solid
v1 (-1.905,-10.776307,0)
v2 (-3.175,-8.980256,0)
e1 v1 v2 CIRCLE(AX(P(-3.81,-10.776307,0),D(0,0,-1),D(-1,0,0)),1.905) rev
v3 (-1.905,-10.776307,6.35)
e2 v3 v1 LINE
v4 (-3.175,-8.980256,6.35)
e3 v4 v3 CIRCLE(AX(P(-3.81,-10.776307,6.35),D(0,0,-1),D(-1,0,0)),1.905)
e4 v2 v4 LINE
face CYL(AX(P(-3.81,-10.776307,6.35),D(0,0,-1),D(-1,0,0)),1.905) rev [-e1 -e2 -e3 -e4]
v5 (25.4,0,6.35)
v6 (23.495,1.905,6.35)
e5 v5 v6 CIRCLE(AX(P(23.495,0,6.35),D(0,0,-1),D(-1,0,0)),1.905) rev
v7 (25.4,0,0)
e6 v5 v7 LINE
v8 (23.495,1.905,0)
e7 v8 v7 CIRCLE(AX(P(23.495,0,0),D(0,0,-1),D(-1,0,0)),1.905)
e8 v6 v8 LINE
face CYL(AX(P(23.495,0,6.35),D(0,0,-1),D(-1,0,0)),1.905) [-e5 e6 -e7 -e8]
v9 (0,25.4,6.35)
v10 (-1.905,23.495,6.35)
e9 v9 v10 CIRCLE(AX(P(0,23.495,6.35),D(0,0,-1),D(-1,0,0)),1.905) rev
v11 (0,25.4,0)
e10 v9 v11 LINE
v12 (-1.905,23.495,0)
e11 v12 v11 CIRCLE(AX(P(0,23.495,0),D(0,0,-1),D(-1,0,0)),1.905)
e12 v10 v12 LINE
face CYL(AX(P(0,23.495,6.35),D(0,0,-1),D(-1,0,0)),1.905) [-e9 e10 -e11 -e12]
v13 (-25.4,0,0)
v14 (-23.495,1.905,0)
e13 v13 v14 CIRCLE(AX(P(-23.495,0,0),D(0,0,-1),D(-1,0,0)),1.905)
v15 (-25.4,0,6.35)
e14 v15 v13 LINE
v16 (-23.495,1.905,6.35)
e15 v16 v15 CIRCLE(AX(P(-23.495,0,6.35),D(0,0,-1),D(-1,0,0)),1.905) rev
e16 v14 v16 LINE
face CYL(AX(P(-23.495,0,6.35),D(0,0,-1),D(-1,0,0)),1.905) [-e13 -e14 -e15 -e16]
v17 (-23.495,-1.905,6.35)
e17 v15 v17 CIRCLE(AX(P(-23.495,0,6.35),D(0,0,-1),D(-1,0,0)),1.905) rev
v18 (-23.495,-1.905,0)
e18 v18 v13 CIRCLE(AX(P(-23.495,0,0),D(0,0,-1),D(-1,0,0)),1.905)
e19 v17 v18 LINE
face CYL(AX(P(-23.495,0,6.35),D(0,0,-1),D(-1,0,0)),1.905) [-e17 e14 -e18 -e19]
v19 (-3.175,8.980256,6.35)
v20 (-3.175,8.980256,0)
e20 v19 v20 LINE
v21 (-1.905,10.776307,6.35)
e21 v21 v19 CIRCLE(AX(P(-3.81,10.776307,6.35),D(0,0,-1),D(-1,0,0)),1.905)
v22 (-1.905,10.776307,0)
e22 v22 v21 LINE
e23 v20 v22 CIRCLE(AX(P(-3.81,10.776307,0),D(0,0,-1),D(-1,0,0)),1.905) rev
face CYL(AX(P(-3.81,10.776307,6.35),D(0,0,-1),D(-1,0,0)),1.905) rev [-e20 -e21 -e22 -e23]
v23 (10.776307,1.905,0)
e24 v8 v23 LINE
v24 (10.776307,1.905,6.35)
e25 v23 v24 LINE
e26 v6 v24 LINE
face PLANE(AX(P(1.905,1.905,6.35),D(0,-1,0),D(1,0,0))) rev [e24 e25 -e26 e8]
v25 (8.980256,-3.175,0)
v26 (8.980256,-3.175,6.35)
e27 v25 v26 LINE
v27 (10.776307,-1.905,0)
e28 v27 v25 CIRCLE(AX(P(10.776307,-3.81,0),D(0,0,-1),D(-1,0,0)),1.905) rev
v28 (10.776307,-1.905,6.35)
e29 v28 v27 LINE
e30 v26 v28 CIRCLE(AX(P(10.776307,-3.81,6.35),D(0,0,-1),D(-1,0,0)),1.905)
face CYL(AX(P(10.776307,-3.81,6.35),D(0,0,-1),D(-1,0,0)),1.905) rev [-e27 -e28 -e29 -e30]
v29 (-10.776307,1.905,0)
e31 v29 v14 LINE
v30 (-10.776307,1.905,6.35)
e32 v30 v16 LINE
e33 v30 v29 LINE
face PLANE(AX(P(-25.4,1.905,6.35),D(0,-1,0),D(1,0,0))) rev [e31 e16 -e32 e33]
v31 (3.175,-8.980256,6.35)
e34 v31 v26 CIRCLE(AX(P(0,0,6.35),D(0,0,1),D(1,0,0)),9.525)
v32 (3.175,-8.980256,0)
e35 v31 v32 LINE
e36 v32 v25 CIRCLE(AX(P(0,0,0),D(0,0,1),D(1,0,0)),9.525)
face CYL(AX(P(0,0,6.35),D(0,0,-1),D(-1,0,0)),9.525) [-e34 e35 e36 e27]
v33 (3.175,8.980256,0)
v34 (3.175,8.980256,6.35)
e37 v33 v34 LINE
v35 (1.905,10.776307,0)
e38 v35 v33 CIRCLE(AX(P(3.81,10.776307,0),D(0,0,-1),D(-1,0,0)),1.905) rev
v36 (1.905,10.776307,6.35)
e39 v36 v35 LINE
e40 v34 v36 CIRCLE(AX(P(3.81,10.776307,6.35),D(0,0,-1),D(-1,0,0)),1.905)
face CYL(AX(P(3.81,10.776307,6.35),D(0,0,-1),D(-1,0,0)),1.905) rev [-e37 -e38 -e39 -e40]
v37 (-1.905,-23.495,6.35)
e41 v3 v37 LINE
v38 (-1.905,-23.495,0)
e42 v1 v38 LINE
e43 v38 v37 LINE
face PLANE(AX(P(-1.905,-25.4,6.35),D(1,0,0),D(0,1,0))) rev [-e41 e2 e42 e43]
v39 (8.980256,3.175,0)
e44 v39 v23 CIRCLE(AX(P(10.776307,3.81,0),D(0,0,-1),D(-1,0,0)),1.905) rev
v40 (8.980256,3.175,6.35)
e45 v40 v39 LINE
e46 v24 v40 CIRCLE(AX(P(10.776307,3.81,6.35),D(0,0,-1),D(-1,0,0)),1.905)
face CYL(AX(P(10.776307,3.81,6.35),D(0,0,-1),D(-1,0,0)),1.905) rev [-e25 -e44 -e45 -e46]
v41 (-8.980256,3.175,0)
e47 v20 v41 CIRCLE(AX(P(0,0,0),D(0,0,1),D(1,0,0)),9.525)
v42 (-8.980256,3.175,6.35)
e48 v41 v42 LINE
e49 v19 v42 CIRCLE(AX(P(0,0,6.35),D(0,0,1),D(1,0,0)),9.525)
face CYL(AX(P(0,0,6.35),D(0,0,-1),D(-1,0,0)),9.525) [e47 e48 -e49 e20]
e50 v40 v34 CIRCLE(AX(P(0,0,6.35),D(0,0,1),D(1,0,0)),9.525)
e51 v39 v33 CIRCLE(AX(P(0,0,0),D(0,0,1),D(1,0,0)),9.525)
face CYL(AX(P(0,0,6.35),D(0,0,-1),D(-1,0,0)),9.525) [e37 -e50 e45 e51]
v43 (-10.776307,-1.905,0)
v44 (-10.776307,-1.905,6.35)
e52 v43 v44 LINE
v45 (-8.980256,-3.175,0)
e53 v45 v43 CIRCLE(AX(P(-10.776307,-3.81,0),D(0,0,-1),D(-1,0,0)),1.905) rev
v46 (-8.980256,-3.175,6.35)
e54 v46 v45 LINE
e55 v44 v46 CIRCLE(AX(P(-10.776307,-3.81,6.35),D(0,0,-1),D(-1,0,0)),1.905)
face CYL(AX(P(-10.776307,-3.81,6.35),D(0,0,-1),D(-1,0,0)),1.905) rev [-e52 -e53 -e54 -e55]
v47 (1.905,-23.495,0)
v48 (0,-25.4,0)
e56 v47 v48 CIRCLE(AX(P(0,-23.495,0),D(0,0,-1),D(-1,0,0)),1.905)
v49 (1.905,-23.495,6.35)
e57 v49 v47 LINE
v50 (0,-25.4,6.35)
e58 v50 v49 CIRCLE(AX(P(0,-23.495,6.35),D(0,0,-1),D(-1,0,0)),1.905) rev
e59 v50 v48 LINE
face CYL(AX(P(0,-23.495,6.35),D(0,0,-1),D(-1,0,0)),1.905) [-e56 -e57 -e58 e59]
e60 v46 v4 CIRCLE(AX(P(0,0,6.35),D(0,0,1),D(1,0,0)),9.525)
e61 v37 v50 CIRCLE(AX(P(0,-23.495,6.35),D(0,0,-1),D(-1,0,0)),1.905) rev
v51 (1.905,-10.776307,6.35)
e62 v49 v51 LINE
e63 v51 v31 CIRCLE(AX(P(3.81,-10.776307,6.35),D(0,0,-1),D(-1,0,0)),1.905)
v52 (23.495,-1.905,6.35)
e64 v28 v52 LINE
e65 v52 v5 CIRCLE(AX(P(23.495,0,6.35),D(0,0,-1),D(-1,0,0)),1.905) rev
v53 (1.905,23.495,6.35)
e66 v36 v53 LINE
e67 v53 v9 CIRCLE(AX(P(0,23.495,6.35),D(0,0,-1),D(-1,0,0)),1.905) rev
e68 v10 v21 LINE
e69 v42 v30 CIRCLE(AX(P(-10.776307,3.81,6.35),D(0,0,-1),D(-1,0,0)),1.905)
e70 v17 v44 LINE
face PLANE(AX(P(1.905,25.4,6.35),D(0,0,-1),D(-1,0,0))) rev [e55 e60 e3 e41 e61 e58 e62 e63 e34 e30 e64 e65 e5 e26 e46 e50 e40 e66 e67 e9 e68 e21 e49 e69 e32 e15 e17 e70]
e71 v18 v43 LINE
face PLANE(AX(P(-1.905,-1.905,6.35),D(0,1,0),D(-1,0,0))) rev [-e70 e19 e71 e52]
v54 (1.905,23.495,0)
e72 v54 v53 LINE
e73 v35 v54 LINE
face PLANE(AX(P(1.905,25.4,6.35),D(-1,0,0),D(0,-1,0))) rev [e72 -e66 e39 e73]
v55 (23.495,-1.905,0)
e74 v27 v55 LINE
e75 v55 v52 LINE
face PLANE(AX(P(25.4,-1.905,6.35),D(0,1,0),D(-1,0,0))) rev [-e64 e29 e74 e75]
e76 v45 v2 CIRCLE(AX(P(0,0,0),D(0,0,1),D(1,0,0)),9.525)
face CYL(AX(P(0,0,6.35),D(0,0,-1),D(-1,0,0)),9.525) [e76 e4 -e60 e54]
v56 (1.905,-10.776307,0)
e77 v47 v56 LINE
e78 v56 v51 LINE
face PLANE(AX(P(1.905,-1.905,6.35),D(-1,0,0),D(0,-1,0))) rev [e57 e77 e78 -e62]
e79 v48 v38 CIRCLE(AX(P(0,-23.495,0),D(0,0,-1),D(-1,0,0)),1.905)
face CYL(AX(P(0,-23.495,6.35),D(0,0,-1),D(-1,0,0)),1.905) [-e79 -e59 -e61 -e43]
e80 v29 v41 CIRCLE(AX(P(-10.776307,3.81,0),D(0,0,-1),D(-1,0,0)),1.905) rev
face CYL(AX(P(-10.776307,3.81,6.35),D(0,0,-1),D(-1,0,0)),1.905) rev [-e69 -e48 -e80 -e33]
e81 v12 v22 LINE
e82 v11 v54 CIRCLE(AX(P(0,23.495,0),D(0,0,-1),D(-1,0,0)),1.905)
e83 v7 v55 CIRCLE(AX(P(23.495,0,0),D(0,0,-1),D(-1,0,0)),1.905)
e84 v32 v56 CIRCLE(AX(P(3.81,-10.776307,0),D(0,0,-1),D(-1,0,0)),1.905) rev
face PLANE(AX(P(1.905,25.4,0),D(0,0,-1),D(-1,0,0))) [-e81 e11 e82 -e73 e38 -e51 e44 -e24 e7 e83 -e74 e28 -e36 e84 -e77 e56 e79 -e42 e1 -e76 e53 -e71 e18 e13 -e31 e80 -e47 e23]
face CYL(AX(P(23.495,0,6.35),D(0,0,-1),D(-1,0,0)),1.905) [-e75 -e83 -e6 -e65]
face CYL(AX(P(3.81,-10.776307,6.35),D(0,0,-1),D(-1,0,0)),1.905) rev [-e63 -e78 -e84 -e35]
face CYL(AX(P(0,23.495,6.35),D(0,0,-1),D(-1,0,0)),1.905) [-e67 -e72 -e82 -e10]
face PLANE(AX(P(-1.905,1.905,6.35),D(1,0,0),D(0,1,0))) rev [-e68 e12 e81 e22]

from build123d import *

# Parameters (mm, degrees)
BOSS_EXTRUDE1_DEPTH = 6.35
SKETCH2_R           = 9.525
BOSS_EXTRUDE2_DEPTH = 6.35
FILLET1_R           = 1.905


with BuildPart() as part:
    # Sketch1 → Boss-Extrude1 (new body)
    with BuildSketch(Plane.XY):
        Polygon((0, 25.4), (1.905, 25.4), (1.905, 1.905), (25.4, 1.905), (25.4, 0), (25.4, -1.905), (1.905, -1.905), (1.905, -25.4), (0, -25.4), (-1.905, -25.4), (-1.905, -1.905), (-25.4, -1.905), (-25.4, 0), (-25.4, 1.905), (-1.905, 1.905), (-1.905, 25.4), align=None)
    extrude(amount=BOSS_EXTRUDE1_DEPTH)

    # Sketch2 → Boss-Extrude2 (add)
    with BuildSketch(Plane.XY):
        Circle(SKETCH2_R)
    extrude(amount=BOSS_EXTRUDE2_DEPTH)

    # Fillet1
    fillet1_edges = [part.edges().sort_by_distance(p)[0] for p in [
        (-9.33255592, -1.905, 3.175),
        (-1.905, -9.33255592, 3.175),
        (-9.33255592, 1.905, 3.175),
        (-1.905, 9.33255592, 3.175),
        (1.905, 9.33255592, 3.175),
        (9.33255592, 1.905, 3.175),
        (9.33255592, -1.905, 3.175),
        (1.905, -9.33255592, 3.175),
        (25.4, 1.905, 3.175),
        (25.4, -1.905, 3.175),
        (1.905, -25.4, 3.175),
        (-1.905, -25.4, 3.175),
        (-25.4, -1.905, 3.175),
        (-25.4, 1.905, 3.175),
        (-1.905, 25.4, 3.175),
        (1.905, 25.4, 3.175),
    ]]
    fillet(fillet1_edges, radius=FILLET1_R - 0.0001)  # a hair under: the kernel refuses the full size


solid = part.part
